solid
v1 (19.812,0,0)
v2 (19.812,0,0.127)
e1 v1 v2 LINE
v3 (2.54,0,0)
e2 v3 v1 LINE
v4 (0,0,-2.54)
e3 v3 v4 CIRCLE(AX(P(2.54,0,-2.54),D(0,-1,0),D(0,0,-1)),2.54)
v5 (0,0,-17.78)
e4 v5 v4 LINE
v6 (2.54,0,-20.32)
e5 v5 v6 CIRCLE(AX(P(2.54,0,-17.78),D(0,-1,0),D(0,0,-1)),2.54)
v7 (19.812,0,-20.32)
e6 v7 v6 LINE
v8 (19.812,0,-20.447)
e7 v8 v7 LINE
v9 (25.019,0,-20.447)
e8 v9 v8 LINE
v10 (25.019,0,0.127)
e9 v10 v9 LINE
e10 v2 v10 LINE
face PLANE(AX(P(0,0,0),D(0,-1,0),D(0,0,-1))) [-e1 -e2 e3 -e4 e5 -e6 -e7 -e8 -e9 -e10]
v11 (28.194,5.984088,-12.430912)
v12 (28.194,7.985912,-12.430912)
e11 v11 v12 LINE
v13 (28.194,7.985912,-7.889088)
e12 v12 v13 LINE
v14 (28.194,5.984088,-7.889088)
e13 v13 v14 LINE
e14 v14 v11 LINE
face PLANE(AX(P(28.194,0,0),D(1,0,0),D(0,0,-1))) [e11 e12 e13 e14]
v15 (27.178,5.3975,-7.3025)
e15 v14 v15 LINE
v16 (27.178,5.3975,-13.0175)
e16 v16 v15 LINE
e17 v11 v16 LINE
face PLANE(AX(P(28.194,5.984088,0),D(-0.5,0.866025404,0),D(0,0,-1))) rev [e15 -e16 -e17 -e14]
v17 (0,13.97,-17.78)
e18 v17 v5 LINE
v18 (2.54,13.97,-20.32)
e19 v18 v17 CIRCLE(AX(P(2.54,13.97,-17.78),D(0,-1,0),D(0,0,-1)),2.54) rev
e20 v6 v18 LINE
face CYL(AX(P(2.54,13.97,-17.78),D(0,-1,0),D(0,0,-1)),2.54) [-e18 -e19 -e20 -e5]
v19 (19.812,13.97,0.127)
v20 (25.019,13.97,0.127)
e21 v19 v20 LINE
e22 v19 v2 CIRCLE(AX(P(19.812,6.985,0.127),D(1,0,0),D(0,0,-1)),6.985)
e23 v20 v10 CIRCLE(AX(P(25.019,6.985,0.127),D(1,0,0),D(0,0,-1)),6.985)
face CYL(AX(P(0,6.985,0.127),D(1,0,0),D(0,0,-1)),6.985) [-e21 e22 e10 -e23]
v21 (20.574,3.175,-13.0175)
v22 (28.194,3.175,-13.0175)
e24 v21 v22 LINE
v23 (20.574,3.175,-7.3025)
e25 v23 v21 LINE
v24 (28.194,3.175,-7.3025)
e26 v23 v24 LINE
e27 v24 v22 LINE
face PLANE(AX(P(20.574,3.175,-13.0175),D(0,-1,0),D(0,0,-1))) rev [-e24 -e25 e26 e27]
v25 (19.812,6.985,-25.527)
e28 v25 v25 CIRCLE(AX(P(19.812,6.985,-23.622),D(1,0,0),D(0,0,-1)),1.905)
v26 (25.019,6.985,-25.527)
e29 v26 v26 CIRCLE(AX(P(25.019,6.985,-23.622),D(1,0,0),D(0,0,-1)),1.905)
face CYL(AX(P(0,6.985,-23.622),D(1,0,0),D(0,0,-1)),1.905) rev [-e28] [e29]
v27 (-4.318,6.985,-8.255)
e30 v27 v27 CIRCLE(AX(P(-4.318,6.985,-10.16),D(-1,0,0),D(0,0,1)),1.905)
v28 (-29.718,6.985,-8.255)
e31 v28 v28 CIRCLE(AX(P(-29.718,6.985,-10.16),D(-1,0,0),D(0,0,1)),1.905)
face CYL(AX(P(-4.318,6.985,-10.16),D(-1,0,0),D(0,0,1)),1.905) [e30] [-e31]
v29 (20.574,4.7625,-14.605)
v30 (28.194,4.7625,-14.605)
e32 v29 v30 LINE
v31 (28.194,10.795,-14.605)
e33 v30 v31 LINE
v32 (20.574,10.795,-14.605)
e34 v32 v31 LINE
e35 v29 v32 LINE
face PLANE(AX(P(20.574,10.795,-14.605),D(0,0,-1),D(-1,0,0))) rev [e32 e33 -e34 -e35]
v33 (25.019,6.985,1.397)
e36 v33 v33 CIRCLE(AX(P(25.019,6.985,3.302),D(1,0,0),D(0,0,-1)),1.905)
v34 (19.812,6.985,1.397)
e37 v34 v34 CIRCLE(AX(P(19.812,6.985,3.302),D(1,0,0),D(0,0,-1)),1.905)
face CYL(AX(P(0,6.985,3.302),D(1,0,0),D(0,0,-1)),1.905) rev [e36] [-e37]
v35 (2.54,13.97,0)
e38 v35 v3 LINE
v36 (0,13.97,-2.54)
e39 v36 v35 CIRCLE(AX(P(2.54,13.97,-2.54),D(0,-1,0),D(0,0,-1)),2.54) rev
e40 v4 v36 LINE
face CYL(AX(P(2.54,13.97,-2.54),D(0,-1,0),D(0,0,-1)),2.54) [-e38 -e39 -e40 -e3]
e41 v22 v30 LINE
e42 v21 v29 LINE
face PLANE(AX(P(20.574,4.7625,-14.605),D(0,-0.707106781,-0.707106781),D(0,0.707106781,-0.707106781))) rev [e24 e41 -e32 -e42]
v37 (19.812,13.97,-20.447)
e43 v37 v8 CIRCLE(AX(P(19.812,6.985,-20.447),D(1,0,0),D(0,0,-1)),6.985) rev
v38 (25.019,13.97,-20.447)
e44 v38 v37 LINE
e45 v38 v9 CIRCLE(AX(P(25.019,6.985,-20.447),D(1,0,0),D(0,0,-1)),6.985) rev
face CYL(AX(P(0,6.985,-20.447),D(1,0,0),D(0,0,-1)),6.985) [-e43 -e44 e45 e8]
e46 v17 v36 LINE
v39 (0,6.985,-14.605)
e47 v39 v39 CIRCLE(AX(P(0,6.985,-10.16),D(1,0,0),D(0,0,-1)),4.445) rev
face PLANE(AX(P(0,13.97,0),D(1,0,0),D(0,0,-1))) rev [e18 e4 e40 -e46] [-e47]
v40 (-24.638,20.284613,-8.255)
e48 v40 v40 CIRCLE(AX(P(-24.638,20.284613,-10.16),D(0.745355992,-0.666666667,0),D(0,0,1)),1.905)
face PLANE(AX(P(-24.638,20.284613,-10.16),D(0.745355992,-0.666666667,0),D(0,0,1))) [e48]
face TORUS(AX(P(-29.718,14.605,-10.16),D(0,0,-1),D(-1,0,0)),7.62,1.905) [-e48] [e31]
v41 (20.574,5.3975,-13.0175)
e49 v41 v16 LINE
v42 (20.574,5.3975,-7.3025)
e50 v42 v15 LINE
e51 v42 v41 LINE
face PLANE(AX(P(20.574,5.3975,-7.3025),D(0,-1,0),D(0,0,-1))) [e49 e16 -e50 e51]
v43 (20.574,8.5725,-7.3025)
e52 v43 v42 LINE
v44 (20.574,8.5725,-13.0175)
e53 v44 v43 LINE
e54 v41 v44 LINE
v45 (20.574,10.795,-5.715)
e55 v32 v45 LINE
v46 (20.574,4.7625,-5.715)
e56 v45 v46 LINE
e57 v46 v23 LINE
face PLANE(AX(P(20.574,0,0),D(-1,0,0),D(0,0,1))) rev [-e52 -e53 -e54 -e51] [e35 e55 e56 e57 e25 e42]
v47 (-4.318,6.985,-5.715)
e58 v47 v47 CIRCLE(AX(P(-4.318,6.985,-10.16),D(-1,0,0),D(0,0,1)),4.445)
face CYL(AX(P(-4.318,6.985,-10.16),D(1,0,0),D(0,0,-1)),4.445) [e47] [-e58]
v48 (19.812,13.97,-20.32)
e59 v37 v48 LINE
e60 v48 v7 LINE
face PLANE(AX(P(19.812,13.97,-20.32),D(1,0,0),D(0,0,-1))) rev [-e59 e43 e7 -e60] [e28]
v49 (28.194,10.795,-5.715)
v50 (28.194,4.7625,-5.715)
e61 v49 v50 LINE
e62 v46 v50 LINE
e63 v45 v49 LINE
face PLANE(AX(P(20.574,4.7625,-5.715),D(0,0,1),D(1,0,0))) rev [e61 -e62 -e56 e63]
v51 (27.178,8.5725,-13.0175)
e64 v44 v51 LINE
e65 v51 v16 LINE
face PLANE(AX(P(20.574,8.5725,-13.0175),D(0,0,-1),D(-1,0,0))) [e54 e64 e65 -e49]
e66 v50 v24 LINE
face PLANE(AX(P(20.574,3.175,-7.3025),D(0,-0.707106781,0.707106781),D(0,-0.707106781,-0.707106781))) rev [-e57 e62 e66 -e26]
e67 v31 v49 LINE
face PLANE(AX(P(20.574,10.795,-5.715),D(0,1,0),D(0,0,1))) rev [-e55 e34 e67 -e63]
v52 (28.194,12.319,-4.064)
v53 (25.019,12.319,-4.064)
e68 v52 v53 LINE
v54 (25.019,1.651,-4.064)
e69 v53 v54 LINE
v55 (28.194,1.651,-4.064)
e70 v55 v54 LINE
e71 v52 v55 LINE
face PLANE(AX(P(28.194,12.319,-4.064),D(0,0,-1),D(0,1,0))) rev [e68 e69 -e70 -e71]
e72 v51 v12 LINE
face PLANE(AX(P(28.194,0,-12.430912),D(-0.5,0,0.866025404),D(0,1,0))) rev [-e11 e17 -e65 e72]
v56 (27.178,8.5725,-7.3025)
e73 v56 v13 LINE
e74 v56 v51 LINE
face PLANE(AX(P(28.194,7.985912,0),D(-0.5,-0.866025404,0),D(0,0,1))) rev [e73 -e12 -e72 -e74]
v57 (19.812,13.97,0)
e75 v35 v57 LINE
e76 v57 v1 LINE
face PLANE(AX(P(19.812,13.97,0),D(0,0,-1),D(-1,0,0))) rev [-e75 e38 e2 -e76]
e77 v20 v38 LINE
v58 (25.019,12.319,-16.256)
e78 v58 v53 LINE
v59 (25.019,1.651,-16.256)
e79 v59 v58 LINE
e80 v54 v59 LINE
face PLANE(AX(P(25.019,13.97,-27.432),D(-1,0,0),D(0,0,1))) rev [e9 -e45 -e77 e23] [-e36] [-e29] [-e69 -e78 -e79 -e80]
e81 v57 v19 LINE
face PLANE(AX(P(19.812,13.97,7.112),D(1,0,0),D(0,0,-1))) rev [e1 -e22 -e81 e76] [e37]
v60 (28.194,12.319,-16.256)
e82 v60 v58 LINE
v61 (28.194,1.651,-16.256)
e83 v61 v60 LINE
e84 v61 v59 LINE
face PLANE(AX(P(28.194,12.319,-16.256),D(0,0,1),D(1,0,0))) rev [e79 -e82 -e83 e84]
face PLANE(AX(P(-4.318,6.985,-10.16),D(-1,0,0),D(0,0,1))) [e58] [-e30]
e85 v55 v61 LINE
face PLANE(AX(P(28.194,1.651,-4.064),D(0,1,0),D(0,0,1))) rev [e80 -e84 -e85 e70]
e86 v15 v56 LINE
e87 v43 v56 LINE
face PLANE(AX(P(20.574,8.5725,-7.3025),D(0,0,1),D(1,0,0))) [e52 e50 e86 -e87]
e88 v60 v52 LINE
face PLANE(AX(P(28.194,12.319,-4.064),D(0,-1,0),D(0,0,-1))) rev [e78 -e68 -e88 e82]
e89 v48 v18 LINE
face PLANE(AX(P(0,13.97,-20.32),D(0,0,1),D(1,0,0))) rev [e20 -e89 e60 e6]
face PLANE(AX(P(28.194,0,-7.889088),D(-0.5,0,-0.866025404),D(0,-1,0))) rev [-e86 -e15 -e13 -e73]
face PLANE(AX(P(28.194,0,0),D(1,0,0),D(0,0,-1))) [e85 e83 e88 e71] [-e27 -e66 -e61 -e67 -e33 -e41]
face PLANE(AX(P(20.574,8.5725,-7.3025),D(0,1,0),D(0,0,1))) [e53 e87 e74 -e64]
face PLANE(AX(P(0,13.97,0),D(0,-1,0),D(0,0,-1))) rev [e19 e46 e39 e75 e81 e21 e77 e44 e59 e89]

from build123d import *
from OCP.BRepFilletAPI import BRepFilletAPI_MakeChamfer

# Parameters (mm, degrees)
BOSS_EXTRUDE1_DEPTH = 13.97
SKETCH2_W           = 12.192
SKETCH2_H           = 10.668
BOSS_EXTRUDE2_DEPTH = 3.175
SKETCH3_W           = 5.715
SKETCH3_H           = 3.175
CUT_EXTRUDE1_DEPTH  = 7.62
CHAMFER1_SIZE       = 1.016
CHAMFER1_SIZE2      = 0.586587873
SKETCH4_R           = 1.905
CUT_EXTRUDE2_DEPTH  = 40.668953667
FILLET1_R           = 2.54
SKETCH5_R           = 4.445
BOSS_EXTRUDE3_DEPTH = 4.318
SKETCH6_R           = 1.905


with BuildPart() as part:
    # Sketch1 → Boss-Extrude1 (new body)
    with BuildSketch(Plane(origin=(0, 0, 0), x_dir=(1, 0, 0), z_dir=(0, 1, 0))):
        Polygon((0, 0), (0, 20.32), (19.812, 20.32), (19.812, 27.432), (25.019, 27.432), (25.019, -7.112), (19.812, -7.112), (19.812, 0), align=None)
    extrude(amount=BOSS_EXTRUDE1_DEPTH)

    # Sketch2 → Boss-Extrude2 (add)
    with BuildSketch(Plane(origin=(25.019, 0, 0), x_dir=(0, 0, -1), z_dir=(1, 0, 0))):
        with Locations((10.16, 6.985)):
            Rectangle(SKETCH2_W, SKETCH2_H)
    extrude(amount=BOSS_EXTRUDE2_DEPTH)

    # Sketch3 → Cut-Extrude1 (cut)
    with BuildSketch(Plane(origin=(28.194, 0, 0), x_dir=(0, 0, -1), z_dir=(1, 0, 0))):
        Polygon((5.715, 10.795), (14.605, 10.795), (14.605, 4.7625), (13.0175, 3.175), (7.3025, 3.175), (5.715, 4.7625), align=None)
        with Locations((10.16, 6.985)):
            Rectangle(SKETCH3_W, SKETCH3_H, mode=Mode.SUBTRACT)
    extrude(amount=-CUT_EXTRUDE1_DEPTH, mode=Mode.SUBTRACT)

    # Chamfer1: one chamfer whose edges measure the first distance from different faces: ONE call of the kernel's chamfer builder (chamfer() names one face for all edges)
    chamfer1_edges_1 = [part.edges().sort_by_distance(p)[0] for p in [
        (28.194, 6.985, -13.0175),
    ]]
    chamfer1_side_1 = [part.faces().sort_by_distance(p)[0] for p in [
        (24.384, 6.985, -13.0175),
    ]]
    chamfer1_edges_2 = [part.edges().sort_by_distance(p)[0] for p in [
        (28.194, 5.3975, -10.16),
    ]]
    chamfer1_side_2 = [part.faces().sort_by_distance(p)[0] for p in [
        (24.384, 5.3975, -10.16),
    ]]
    chamfer1_edges_3 = [part.edges().sort_by_distance(p)[0] for p in [
        (28.194, 6.985, -7.3025),
    ]]
    chamfer1_side_3 = [part.faces().sort_by_distance(p)[0] for p in [
        (24.384, 6.985, -7.3025),
    ]]
    chamfer1_edges_4 = [part.edges().sort_by_distance(p)[0] for p in [
        (28.194, 8.5725, -10.16),
    ]]
    chamfer1_side_4 = [part.faces().sort_by_distance(p)[0] for p in [
        (24.384, 8.5725, -10.16),
    ]]
    chamfer1 = BRepFilletAPI_MakeChamfer(part.part.solid().wrapped)
    for e in chamfer1_edges_1:
        chamfer1.Add(CHAMFER1_SIZE, CHAMFER1_SIZE2, e.wrapped, chamfer1_side_1[0].wrapped)  # the first distance lies on this face
    for e in chamfer1_edges_2:
        chamfer1.Add(CHAMFER1_SIZE, CHAMFER1_SIZE2, e.wrapped, chamfer1_side_2[0].wrapped)  # the first distance lies on this face
    for e in chamfer1_edges_3:
        chamfer1.Add(CHAMFER1_SIZE, CHAMFER1_SIZE2, e.wrapped, chamfer1_side_3[0].wrapped)  # the first distance lies on this face
    for e in chamfer1_edges_4:
        chamfer1.Add(CHAMFER1_SIZE, CHAMFER1_SIZE2, e.wrapped, chamfer1_side_4[0].wrapped)  # the first distance lies on this face
    add(Compound.cast(chamfer1.Shape()), mode=Mode.REPLACE)

    # Sketch4 → Cut-Extrude2 (cut, through all)
    with BuildSketch(Plane(origin=(25.019, 0, 0), x_dir=(0, 0, -1), z_dir=(1, 0, 0))):
        with BuildLine():
            Line((-7.112, 0), (-0.127, 0))
            ThreePointArc((-0.127, 0), (-5.06614087, 2.045859136), (-7.112, 6.985000009))
            Line((-7.112, 6.985000009), (-7.112, 0))
        make_face()
        with BuildLine():
            Line((-7.112, 13.97), (-7.112, 6.985000009))
            ThreePointArc((-7.112, 6.985000009), (-5.066140864, 11.92414087), (-0.127, 13.97))
            Line((-0.127, 13.97), (-7.112, 13.97))
        make_face()
        with BuildLine():
            ThreePointArc((27.432, 6.985), (25.386140867, 2.045859133), (20.447, 0))
            Line((20.447, 0), (27.432, 0))
            Line((27.432, 0), (27.432, 6.985))
        make_face()
        with BuildLine():
            ThreePointArc((20.447, 13.97), (25.386140867, 11.924140867), (27.432, 6.985))
            Line((27.432, 6.985), (27.432, 13.97))
            Line((27.432, 13.97), (20.447, 13.97))
        make_face()
        with Locations((-3.302, 6.985)):
            Circle(SKETCH4_R)
        with Locations((23.622, 6.985)):
            Circle(SKETCH4_R)
    extrude(amount=-CUT_EXTRUDE2_DEPTH, mode=Mode.SUBTRACT)

    # Fillet1
    fillet1_edges = [part.edges().sort_by_distance(p)[0] for p in [
        (0, 6.985, 0),
        (0, 6.985, -20.32),
    ]]
    fillet(fillet1_edges, radius=FILLET1_R)

    # Sketch5 → Boss-Extrude3 (add)
    with BuildSketch(Plane.ZY):
        with Locations((-10.16, 6.985)):
            Circle(SKETCH5_R)
    extrude(amount=BOSS_EXTRUDE3_DEPTH)

    # Sweep1: sweep along a path in Sketch7
    with BuildLine(Plane(origin=(0, 0, -10.16), x_dir=(-1, 0, 0), z_dir=(0, 0, -1))) as sweep1_path:
        Line((4.318, 6.985), (29.718, 6.985))
        ThreePointArc((29.718, 6.985), (36.836393375, 17.323984324), (24.638, 20.284612663))
    # Sketch6 → Sweep1 (sweep)
    with BuildSketch(Plane.ZY.offset(4.318)):
        with Locations((-10.16, 6.985)):
            Circle(SKETCH6_R)
    sweep(path=sweep1_path.line)


solid = part.part
